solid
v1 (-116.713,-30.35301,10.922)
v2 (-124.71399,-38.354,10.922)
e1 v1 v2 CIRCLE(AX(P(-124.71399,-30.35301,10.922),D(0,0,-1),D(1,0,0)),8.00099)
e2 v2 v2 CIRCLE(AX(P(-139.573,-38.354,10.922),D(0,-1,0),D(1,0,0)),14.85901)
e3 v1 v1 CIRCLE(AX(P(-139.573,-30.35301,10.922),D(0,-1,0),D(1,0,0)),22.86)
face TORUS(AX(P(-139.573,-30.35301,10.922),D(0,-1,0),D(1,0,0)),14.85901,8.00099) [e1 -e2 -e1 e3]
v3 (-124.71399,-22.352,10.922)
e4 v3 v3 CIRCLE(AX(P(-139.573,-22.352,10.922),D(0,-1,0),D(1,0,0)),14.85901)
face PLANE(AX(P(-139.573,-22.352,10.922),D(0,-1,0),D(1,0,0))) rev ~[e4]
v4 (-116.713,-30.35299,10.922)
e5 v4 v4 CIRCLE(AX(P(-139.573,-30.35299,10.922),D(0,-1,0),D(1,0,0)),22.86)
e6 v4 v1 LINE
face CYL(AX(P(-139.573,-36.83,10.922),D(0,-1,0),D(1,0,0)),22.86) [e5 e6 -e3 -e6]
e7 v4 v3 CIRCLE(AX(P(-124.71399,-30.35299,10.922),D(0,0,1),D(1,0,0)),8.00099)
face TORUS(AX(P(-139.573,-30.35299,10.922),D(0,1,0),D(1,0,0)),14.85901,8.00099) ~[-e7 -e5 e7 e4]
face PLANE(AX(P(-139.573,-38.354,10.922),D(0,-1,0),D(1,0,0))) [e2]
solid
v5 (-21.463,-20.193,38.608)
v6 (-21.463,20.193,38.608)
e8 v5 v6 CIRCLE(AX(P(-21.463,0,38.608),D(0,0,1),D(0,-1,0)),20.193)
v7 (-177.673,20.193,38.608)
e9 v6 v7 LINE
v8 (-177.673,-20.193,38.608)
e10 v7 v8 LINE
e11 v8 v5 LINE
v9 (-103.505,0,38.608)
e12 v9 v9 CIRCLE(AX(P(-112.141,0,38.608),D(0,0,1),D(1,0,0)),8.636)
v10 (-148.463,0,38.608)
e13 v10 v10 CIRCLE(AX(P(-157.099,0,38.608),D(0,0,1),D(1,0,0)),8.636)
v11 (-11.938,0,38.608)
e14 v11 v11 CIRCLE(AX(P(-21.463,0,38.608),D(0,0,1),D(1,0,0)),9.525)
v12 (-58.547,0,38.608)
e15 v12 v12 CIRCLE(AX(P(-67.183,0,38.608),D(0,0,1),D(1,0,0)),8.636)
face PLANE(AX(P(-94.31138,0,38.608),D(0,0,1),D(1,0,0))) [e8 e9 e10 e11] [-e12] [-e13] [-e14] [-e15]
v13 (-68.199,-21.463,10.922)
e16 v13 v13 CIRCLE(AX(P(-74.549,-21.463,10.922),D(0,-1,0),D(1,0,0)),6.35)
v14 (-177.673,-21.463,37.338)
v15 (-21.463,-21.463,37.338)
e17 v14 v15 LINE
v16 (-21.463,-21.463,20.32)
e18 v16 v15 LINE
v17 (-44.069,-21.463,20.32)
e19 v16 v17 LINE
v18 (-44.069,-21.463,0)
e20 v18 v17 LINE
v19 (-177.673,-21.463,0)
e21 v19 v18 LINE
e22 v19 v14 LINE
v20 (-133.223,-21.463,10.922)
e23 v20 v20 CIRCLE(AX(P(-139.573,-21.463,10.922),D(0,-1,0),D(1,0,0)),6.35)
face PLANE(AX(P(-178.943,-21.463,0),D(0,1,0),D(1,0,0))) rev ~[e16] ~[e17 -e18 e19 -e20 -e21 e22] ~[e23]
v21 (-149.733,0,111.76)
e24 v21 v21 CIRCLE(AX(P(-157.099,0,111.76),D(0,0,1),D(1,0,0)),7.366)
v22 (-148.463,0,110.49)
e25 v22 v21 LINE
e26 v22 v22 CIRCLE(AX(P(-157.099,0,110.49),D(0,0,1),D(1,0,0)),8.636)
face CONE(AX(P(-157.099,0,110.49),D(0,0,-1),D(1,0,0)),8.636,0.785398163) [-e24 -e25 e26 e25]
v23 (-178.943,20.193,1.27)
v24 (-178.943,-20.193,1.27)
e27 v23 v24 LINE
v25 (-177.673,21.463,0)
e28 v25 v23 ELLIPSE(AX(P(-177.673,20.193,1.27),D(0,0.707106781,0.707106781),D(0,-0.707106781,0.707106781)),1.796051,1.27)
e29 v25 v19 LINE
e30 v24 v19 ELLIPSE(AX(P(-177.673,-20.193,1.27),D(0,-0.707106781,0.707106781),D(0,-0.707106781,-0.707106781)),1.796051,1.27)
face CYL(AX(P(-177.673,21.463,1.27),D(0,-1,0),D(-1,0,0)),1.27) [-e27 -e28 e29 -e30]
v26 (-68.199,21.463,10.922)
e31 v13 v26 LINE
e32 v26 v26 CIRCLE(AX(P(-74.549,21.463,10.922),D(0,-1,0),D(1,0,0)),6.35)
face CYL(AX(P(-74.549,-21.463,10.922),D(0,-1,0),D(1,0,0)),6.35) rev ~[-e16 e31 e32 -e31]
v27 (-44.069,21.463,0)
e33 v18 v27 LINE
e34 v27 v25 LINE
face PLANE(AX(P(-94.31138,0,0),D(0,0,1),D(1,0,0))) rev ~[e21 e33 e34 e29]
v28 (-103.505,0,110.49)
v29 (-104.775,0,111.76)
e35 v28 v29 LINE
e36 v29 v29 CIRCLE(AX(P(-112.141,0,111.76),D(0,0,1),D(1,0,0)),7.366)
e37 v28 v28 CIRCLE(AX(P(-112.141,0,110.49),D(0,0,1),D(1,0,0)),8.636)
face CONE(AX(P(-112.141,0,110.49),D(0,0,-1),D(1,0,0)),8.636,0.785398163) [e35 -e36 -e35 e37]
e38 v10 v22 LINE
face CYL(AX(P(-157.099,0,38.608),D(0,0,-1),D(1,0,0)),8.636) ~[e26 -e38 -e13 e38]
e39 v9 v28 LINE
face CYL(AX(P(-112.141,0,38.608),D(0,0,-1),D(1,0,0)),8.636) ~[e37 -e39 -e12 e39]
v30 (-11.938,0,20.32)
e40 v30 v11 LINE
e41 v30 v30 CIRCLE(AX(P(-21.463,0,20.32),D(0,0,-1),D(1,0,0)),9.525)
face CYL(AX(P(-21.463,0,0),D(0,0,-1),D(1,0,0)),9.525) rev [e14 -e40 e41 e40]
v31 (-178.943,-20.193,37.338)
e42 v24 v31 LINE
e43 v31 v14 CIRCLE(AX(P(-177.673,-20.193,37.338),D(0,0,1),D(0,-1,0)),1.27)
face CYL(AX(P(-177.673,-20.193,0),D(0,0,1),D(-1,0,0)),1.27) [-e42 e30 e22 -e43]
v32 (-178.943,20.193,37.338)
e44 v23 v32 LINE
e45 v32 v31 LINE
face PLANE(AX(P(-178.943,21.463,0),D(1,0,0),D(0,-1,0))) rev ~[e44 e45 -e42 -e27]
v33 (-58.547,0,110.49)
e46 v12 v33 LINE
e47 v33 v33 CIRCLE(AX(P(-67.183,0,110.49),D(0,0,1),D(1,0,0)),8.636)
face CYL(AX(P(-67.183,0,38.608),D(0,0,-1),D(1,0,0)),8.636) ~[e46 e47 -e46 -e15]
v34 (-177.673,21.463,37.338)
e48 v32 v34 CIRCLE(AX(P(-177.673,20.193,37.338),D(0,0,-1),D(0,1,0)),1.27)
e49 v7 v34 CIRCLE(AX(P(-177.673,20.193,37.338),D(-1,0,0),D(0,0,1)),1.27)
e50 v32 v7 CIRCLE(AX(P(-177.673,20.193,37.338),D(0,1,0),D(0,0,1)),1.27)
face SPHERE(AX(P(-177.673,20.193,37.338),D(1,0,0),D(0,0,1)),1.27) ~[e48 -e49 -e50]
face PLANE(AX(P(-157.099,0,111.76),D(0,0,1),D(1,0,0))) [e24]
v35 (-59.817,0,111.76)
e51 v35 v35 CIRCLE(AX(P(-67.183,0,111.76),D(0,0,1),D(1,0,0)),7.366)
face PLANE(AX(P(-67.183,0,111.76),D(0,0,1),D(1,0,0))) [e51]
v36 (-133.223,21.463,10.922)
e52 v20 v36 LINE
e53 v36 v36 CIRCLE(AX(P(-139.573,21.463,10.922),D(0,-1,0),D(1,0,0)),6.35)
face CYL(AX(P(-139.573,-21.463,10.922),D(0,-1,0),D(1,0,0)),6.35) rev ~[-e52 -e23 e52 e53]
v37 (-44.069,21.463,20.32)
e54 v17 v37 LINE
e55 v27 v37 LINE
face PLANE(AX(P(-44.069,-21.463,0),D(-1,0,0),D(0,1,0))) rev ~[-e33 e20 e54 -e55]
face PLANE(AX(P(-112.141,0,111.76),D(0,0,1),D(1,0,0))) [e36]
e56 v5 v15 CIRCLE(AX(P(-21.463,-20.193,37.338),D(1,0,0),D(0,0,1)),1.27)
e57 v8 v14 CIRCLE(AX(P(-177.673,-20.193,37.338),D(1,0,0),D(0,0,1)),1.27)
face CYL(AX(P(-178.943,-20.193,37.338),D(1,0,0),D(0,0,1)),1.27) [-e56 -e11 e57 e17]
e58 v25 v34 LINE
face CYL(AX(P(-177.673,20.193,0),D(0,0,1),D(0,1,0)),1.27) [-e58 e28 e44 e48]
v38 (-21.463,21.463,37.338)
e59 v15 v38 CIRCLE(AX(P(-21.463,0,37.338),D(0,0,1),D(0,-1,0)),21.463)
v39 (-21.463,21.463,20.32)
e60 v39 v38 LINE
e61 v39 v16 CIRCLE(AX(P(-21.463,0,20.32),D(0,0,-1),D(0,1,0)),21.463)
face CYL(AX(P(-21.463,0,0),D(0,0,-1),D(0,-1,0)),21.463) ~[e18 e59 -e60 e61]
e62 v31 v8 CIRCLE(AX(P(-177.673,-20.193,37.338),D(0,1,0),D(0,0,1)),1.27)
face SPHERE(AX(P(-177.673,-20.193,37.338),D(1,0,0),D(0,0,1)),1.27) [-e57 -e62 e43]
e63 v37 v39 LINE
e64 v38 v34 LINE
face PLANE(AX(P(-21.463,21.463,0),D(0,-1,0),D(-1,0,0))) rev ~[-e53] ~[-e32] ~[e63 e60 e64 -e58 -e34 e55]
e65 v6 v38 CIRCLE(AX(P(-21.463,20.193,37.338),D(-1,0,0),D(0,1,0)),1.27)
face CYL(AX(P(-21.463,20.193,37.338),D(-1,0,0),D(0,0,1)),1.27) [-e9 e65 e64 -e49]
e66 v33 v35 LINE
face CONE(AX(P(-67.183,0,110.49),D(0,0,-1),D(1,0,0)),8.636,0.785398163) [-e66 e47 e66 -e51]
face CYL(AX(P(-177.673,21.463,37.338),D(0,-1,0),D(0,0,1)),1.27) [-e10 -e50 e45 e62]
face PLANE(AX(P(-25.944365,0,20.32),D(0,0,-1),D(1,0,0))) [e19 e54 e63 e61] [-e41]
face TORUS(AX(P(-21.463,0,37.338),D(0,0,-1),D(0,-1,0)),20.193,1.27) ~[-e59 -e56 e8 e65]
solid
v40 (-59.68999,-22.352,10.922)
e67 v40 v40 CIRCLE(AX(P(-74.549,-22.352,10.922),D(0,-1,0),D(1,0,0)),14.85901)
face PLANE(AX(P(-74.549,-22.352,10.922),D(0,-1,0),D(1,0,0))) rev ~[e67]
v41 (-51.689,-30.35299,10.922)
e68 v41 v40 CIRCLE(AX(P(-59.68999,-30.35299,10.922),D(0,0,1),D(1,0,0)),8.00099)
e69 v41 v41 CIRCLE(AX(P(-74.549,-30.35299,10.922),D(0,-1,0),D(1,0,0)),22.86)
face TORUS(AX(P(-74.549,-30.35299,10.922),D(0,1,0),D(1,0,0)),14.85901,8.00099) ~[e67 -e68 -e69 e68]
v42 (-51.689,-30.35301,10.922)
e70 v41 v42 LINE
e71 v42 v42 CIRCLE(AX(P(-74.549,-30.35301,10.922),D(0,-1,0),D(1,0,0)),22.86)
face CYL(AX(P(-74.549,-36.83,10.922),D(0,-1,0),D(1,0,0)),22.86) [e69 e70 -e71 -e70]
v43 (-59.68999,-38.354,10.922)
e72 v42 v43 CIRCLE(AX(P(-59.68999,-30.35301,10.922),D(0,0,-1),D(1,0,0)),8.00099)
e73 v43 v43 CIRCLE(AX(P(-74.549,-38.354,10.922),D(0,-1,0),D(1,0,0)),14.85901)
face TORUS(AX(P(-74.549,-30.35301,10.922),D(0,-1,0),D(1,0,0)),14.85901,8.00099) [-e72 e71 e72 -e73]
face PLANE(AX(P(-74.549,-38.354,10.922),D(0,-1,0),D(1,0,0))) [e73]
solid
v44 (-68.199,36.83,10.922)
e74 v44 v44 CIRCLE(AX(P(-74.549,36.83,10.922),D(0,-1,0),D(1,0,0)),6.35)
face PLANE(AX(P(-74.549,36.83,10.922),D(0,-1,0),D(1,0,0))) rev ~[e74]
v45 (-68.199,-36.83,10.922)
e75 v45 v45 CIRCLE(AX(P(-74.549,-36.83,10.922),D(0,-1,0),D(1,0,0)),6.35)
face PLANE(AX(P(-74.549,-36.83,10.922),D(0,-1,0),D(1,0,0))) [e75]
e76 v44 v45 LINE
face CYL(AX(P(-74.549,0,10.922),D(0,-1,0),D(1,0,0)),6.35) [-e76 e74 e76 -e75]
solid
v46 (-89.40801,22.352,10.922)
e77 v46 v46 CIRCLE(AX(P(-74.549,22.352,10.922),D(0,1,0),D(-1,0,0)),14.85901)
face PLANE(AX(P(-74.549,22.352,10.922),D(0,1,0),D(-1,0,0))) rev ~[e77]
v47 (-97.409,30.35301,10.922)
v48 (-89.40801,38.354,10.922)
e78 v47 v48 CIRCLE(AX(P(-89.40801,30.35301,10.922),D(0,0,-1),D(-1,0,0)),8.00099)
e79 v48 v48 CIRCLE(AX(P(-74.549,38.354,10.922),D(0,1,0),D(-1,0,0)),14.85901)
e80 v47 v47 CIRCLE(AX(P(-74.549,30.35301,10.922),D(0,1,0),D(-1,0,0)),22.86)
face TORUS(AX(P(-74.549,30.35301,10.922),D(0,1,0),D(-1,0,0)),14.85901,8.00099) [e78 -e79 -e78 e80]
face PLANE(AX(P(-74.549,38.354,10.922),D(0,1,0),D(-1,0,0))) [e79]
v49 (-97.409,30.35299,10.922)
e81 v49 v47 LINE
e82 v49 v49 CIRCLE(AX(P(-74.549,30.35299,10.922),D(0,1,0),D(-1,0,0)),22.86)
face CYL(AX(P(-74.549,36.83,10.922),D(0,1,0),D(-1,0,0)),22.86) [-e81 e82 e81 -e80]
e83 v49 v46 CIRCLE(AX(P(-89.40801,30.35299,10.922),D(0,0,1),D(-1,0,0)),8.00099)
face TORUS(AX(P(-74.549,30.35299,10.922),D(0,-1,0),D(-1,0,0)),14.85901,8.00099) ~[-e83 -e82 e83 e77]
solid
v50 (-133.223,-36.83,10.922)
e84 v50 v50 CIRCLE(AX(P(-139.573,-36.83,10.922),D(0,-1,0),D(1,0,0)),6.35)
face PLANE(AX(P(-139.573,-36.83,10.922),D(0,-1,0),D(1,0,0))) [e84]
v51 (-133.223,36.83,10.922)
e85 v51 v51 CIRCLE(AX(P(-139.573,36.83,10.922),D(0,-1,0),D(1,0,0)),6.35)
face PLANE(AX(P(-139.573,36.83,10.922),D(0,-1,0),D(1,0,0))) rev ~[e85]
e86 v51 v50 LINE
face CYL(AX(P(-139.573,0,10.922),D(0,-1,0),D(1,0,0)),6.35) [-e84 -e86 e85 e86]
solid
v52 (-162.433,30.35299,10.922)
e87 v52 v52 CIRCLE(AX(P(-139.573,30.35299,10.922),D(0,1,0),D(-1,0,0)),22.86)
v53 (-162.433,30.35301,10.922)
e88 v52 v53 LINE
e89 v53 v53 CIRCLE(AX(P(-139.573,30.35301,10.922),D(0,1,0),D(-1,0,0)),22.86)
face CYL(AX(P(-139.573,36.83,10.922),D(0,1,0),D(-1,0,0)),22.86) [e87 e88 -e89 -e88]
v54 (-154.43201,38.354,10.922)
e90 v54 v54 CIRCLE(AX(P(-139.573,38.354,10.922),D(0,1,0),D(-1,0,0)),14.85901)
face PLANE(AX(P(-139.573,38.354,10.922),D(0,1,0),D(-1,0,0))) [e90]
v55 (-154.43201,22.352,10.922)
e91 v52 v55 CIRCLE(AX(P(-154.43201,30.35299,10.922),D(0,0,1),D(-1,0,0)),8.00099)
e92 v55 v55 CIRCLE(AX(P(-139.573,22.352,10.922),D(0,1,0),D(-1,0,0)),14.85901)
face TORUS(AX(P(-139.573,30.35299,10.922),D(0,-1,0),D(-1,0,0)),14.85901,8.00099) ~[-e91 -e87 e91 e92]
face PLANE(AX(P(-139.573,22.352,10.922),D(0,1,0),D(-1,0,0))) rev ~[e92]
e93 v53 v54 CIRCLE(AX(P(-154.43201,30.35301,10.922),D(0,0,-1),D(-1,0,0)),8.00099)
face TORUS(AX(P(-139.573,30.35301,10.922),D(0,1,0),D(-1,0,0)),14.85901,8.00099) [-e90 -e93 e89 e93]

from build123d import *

# Parameters (mm, degrees)
F0_R           = 9.525
F1_DEPTH       = 38.608
F2_R           = 9.525
F3_DEPTH       = 20.32
F4_R           = 6.35
F5_DEPTH       = 42.926
F6_R           = 8.636
F7_DEPTH       = 73.152
F8_SIZE        = 1.27
F9_R           = 1.27
F10_R          = 6.35
F11_DEPTH      = 36.83
F12_R          = 22.86
F13_DEPTH      = 1.524
F13_DEPTH_BACK = 14.478
F12_R_2        = 6.35
F14_R          = 22.86
F14_R_2        = 6.35
F15_DEPTH      = 1.524
F15_DEPTH_BACK = 14.478
F16_R          = 8.00099
F16_2_R        = 8.00099
F16_3_R        = 8.00099
F16_4_R        = 8.00099


# Not quite as in the source:
# - a fillet or chamfer is up to 0.001 mm smaller than in the source, because OpenCascade refuses the exact size


with BuildPart() as f1:
    # F0 (on Top) → F1 (new body)
    with BuildSketch(Plane.XY):
        with BuildLine():
            Line((-21.463, 21.463), (-178.943, 21.463))
            Line((-178.943, 21.463), (-178.943, -21.463))
            Line((-178.943, -21.463), (-21.463, -21.463))
            ThreePointArc((-21.463, -21.463), (0, 0), (-21.463, 21.463))
        make_face()
        with Locations((-21.463, 0)):
            Circle(F0_R, mode=Mode.SUBTRACT)
    extrude(amount=F1_DEPTH)

    # F2 (on face) → F3 (cut)
    with BuildSketch(Plane(origin=(0, 0, 0), x_dir=(1, 0, 0), z_dir=(0, 0, -1))):
        with BuildLine():
            Line((-21.463, 21.463), (-44.069, 21.463))
            Line((-44.069, 21.463), (-44.069, -21.463))
            Line((-44.069, -21.463), (-21.463, -21.463))
            ThreePointArc((-21.463, -21.463), (0, 0), (-21.463, 21.463))
        make_face()
        with Locations((-21.463, 0)):
            Circle(F2_R, mode=Mode.SUBTRACT)
    extrude(amount=-F3_DEPTH, mode=Mode.SUBTRACT)

    # F4 (on face) → F5 (cut, through all)
    with BuildSketch(Plane.XZ.offset(21.463)):
        with Locations((-139.573, 10.922)):
            Circle(F4_R)
        with Locations((-74.549, 10.922)):
            Circle(F4_R)
    extrude(amount=-F5_DEPTH, mode=Mode.SUBTRACT)

    # F6 (on face) → F7 (join)
    with BuildSketch(Plane.XY.offset(38.608)):
        with Locations((-157.099, 0)):
            Circle(F6_R)
        with Locations((-112.141, 0)):
            Circle(F6_R)
        with Locations((-67.183, 0)):
            Circle(F6_R)
    extrude(amount=F7_DEPTH)

    # F8
    f8_edges = [f1.edges().sort_by_distance(p)[0] for p in [
        (-165.735, 0, 111.76),
        (-120.777, 0, 111.76),
        (-75.819, 0, 111.76),
    ]]
    chamfer(f8_edges, length=F8_SIZE)

    # F9
    f9_edges = [f1.edges().sort_by_distance(p)[0] for p in [
        (-100.203, 21.463, 38.608),
        (0, 0, 38.608),
        (-100.203, -21.463, 38.608),
        (-178.943, 0, 38.608),
        (-178.943, 21.463, 19.304),
        (-178.943, 0, 0),
        (-178.943, -21.463, 19.304),
    ]]
    fillet(f9_edges, radius=F9_R)


with BuildPart() as f11:
    # F10 (on Front) → F11 (new body, symmetric)
    with BuildSketch(Plane.XZ):
        with Locations((-139.573, 10.922)):
            Circle(F10_R)
    extrude(amount=F11_DEPTH, both=True)


with BuildPart() as f11b:
    # F10 (on Front) → F11, piece 2 (new body, symmetric)
    with BuildSketch(Plane.XZ):
        with Locations((-74.549, 10.922)):
            Circle(F10_R)
    extrude(amount=F11_DEPTH, both=True)


with BuildPart() as f13:
    # F12 (on face) → F13 (new body, two sides)
    with BuildSketch(Plane.XZ.offset(36.83)) as f13_sk:
        with Locations((-139.573, 10.922)):
            Circle(F12_R)
    extrude(amount=F13_DEPTH)
    extrude(f13_sk.sketch, amount=-F13_DEPTH_BACK)

    # F16 (radius 8.001 in the source; OpenCascade refuses exactly that, so slightly less here)
    f16_edges = [f13.edges().sort_by_distance(p)[0] for p in [
        (-162.433, -38.354, 10.922),
        (-162.433, -22.352, 10.922),
    ]]
    fillet(f16_edges, radius=F16_R)


with BuildPart() as f13b:
    # F12 (on face) → F13, piece 2 (new body, two sides)
    with BuildSketch(Plane.XZ.offset(36.83)) as f13_2_sk:
        with Locations((-74.549, 10.922)):
            Circle(F12_R)
        with Locations((-74.549, 10.922)):
            Circle(F12_R_2, mode=Mode.SUBTRACT)
        with Locations((-74.549, 10.922)):
            Circle(F12_R_2)
    extrude(amount=F13_DEPTH)
    extrude(f13_2_sk.sketch, amount=-F13_DEPTH_BACK)

    # F16#2 (radius 8.001 in the source; OpenCascade refuses exactly that, so slightly less here)
    f16_2_edges = [f13b.edges().sort_by_distance(p)[0] for p in [
        (-97.409, -38.354, 10.922),
        (-97.409, -22.352, 10.922),
    ]]
    fillet(f16_2_edges, radius=F16_2_R)


with BuildPart() as f15:
    # F14 (on face) → F15 (new body, two sides)
    with BuildSketch(Plane(origin=(0, 36.83, 0), x_dir=(-1, 0, 0), z_dir=(0, 1, 0))) as f15_sk:
        with Locations((139.573, 10.922)):
            Circle(F14_R)
        with Locations((139.573, 10.922)):
            Circle(F14_R_2, mode=Mode.SUBTRACT)
        with Locations((139.573, 10.922)):
            Circle(F14_R_2)
    extrude(amount=F15_DEPTH)
    extrude(f15_sk.sketch, amount=-F15_DEPTH_BACK)

    # F16#3 (radius 8.001 in the source; OpenCascade refuses exactly that, so slightly less here)
    f16_3_edges = [f15.edges().sort_by_distance(p)[0] for p in [
        (-116.713, 38.354, 10.922),
        (-116.713, 22.352, 10.922),
    ]]
    fillet(f16_3_edges, radius=F16_3_R)


with BuildPart() as f15b:
    # F14 (on face) → F15, piece 2 (new body, two sides)
    with BuildSketch(Plane(origin=(0, 36.83, 0), x_dir=(-1, 0, 0), z_dir=(0, 1, 0))) as f15_2_sk:
        with Locations((74.549, 10.922)):
            Circle(F14_R)
        with Locations((74.549, 10.922)):
            Circle(F14_R_2, mode=Mode.SUBTRACT)
        with Locations((74.549, 10.922)):
            Circle(F14_R_2)
    extrude(amount=F15_DEPTH)
    extrude(f15_2_sk.sketch, amount=-F15_DEPTH_BACK)

    # F16#4 (radius 8.001 in the source; OpenCascade refuses exactly that, so slightly less here)
    f16_4_edges = [f15b.edges().sort_by_distance(p)[0] for p in [
        (-51.689, 22.352, 10.922),
        (-51.689, 38.354, 10.922),
    ]]
    fillet(f16_4_edges, radius=F16_4_R)


solid = Compound([f1.part, f11.part, f11b.part, f13.part, f13b.part, f15.part, f15b.part])
